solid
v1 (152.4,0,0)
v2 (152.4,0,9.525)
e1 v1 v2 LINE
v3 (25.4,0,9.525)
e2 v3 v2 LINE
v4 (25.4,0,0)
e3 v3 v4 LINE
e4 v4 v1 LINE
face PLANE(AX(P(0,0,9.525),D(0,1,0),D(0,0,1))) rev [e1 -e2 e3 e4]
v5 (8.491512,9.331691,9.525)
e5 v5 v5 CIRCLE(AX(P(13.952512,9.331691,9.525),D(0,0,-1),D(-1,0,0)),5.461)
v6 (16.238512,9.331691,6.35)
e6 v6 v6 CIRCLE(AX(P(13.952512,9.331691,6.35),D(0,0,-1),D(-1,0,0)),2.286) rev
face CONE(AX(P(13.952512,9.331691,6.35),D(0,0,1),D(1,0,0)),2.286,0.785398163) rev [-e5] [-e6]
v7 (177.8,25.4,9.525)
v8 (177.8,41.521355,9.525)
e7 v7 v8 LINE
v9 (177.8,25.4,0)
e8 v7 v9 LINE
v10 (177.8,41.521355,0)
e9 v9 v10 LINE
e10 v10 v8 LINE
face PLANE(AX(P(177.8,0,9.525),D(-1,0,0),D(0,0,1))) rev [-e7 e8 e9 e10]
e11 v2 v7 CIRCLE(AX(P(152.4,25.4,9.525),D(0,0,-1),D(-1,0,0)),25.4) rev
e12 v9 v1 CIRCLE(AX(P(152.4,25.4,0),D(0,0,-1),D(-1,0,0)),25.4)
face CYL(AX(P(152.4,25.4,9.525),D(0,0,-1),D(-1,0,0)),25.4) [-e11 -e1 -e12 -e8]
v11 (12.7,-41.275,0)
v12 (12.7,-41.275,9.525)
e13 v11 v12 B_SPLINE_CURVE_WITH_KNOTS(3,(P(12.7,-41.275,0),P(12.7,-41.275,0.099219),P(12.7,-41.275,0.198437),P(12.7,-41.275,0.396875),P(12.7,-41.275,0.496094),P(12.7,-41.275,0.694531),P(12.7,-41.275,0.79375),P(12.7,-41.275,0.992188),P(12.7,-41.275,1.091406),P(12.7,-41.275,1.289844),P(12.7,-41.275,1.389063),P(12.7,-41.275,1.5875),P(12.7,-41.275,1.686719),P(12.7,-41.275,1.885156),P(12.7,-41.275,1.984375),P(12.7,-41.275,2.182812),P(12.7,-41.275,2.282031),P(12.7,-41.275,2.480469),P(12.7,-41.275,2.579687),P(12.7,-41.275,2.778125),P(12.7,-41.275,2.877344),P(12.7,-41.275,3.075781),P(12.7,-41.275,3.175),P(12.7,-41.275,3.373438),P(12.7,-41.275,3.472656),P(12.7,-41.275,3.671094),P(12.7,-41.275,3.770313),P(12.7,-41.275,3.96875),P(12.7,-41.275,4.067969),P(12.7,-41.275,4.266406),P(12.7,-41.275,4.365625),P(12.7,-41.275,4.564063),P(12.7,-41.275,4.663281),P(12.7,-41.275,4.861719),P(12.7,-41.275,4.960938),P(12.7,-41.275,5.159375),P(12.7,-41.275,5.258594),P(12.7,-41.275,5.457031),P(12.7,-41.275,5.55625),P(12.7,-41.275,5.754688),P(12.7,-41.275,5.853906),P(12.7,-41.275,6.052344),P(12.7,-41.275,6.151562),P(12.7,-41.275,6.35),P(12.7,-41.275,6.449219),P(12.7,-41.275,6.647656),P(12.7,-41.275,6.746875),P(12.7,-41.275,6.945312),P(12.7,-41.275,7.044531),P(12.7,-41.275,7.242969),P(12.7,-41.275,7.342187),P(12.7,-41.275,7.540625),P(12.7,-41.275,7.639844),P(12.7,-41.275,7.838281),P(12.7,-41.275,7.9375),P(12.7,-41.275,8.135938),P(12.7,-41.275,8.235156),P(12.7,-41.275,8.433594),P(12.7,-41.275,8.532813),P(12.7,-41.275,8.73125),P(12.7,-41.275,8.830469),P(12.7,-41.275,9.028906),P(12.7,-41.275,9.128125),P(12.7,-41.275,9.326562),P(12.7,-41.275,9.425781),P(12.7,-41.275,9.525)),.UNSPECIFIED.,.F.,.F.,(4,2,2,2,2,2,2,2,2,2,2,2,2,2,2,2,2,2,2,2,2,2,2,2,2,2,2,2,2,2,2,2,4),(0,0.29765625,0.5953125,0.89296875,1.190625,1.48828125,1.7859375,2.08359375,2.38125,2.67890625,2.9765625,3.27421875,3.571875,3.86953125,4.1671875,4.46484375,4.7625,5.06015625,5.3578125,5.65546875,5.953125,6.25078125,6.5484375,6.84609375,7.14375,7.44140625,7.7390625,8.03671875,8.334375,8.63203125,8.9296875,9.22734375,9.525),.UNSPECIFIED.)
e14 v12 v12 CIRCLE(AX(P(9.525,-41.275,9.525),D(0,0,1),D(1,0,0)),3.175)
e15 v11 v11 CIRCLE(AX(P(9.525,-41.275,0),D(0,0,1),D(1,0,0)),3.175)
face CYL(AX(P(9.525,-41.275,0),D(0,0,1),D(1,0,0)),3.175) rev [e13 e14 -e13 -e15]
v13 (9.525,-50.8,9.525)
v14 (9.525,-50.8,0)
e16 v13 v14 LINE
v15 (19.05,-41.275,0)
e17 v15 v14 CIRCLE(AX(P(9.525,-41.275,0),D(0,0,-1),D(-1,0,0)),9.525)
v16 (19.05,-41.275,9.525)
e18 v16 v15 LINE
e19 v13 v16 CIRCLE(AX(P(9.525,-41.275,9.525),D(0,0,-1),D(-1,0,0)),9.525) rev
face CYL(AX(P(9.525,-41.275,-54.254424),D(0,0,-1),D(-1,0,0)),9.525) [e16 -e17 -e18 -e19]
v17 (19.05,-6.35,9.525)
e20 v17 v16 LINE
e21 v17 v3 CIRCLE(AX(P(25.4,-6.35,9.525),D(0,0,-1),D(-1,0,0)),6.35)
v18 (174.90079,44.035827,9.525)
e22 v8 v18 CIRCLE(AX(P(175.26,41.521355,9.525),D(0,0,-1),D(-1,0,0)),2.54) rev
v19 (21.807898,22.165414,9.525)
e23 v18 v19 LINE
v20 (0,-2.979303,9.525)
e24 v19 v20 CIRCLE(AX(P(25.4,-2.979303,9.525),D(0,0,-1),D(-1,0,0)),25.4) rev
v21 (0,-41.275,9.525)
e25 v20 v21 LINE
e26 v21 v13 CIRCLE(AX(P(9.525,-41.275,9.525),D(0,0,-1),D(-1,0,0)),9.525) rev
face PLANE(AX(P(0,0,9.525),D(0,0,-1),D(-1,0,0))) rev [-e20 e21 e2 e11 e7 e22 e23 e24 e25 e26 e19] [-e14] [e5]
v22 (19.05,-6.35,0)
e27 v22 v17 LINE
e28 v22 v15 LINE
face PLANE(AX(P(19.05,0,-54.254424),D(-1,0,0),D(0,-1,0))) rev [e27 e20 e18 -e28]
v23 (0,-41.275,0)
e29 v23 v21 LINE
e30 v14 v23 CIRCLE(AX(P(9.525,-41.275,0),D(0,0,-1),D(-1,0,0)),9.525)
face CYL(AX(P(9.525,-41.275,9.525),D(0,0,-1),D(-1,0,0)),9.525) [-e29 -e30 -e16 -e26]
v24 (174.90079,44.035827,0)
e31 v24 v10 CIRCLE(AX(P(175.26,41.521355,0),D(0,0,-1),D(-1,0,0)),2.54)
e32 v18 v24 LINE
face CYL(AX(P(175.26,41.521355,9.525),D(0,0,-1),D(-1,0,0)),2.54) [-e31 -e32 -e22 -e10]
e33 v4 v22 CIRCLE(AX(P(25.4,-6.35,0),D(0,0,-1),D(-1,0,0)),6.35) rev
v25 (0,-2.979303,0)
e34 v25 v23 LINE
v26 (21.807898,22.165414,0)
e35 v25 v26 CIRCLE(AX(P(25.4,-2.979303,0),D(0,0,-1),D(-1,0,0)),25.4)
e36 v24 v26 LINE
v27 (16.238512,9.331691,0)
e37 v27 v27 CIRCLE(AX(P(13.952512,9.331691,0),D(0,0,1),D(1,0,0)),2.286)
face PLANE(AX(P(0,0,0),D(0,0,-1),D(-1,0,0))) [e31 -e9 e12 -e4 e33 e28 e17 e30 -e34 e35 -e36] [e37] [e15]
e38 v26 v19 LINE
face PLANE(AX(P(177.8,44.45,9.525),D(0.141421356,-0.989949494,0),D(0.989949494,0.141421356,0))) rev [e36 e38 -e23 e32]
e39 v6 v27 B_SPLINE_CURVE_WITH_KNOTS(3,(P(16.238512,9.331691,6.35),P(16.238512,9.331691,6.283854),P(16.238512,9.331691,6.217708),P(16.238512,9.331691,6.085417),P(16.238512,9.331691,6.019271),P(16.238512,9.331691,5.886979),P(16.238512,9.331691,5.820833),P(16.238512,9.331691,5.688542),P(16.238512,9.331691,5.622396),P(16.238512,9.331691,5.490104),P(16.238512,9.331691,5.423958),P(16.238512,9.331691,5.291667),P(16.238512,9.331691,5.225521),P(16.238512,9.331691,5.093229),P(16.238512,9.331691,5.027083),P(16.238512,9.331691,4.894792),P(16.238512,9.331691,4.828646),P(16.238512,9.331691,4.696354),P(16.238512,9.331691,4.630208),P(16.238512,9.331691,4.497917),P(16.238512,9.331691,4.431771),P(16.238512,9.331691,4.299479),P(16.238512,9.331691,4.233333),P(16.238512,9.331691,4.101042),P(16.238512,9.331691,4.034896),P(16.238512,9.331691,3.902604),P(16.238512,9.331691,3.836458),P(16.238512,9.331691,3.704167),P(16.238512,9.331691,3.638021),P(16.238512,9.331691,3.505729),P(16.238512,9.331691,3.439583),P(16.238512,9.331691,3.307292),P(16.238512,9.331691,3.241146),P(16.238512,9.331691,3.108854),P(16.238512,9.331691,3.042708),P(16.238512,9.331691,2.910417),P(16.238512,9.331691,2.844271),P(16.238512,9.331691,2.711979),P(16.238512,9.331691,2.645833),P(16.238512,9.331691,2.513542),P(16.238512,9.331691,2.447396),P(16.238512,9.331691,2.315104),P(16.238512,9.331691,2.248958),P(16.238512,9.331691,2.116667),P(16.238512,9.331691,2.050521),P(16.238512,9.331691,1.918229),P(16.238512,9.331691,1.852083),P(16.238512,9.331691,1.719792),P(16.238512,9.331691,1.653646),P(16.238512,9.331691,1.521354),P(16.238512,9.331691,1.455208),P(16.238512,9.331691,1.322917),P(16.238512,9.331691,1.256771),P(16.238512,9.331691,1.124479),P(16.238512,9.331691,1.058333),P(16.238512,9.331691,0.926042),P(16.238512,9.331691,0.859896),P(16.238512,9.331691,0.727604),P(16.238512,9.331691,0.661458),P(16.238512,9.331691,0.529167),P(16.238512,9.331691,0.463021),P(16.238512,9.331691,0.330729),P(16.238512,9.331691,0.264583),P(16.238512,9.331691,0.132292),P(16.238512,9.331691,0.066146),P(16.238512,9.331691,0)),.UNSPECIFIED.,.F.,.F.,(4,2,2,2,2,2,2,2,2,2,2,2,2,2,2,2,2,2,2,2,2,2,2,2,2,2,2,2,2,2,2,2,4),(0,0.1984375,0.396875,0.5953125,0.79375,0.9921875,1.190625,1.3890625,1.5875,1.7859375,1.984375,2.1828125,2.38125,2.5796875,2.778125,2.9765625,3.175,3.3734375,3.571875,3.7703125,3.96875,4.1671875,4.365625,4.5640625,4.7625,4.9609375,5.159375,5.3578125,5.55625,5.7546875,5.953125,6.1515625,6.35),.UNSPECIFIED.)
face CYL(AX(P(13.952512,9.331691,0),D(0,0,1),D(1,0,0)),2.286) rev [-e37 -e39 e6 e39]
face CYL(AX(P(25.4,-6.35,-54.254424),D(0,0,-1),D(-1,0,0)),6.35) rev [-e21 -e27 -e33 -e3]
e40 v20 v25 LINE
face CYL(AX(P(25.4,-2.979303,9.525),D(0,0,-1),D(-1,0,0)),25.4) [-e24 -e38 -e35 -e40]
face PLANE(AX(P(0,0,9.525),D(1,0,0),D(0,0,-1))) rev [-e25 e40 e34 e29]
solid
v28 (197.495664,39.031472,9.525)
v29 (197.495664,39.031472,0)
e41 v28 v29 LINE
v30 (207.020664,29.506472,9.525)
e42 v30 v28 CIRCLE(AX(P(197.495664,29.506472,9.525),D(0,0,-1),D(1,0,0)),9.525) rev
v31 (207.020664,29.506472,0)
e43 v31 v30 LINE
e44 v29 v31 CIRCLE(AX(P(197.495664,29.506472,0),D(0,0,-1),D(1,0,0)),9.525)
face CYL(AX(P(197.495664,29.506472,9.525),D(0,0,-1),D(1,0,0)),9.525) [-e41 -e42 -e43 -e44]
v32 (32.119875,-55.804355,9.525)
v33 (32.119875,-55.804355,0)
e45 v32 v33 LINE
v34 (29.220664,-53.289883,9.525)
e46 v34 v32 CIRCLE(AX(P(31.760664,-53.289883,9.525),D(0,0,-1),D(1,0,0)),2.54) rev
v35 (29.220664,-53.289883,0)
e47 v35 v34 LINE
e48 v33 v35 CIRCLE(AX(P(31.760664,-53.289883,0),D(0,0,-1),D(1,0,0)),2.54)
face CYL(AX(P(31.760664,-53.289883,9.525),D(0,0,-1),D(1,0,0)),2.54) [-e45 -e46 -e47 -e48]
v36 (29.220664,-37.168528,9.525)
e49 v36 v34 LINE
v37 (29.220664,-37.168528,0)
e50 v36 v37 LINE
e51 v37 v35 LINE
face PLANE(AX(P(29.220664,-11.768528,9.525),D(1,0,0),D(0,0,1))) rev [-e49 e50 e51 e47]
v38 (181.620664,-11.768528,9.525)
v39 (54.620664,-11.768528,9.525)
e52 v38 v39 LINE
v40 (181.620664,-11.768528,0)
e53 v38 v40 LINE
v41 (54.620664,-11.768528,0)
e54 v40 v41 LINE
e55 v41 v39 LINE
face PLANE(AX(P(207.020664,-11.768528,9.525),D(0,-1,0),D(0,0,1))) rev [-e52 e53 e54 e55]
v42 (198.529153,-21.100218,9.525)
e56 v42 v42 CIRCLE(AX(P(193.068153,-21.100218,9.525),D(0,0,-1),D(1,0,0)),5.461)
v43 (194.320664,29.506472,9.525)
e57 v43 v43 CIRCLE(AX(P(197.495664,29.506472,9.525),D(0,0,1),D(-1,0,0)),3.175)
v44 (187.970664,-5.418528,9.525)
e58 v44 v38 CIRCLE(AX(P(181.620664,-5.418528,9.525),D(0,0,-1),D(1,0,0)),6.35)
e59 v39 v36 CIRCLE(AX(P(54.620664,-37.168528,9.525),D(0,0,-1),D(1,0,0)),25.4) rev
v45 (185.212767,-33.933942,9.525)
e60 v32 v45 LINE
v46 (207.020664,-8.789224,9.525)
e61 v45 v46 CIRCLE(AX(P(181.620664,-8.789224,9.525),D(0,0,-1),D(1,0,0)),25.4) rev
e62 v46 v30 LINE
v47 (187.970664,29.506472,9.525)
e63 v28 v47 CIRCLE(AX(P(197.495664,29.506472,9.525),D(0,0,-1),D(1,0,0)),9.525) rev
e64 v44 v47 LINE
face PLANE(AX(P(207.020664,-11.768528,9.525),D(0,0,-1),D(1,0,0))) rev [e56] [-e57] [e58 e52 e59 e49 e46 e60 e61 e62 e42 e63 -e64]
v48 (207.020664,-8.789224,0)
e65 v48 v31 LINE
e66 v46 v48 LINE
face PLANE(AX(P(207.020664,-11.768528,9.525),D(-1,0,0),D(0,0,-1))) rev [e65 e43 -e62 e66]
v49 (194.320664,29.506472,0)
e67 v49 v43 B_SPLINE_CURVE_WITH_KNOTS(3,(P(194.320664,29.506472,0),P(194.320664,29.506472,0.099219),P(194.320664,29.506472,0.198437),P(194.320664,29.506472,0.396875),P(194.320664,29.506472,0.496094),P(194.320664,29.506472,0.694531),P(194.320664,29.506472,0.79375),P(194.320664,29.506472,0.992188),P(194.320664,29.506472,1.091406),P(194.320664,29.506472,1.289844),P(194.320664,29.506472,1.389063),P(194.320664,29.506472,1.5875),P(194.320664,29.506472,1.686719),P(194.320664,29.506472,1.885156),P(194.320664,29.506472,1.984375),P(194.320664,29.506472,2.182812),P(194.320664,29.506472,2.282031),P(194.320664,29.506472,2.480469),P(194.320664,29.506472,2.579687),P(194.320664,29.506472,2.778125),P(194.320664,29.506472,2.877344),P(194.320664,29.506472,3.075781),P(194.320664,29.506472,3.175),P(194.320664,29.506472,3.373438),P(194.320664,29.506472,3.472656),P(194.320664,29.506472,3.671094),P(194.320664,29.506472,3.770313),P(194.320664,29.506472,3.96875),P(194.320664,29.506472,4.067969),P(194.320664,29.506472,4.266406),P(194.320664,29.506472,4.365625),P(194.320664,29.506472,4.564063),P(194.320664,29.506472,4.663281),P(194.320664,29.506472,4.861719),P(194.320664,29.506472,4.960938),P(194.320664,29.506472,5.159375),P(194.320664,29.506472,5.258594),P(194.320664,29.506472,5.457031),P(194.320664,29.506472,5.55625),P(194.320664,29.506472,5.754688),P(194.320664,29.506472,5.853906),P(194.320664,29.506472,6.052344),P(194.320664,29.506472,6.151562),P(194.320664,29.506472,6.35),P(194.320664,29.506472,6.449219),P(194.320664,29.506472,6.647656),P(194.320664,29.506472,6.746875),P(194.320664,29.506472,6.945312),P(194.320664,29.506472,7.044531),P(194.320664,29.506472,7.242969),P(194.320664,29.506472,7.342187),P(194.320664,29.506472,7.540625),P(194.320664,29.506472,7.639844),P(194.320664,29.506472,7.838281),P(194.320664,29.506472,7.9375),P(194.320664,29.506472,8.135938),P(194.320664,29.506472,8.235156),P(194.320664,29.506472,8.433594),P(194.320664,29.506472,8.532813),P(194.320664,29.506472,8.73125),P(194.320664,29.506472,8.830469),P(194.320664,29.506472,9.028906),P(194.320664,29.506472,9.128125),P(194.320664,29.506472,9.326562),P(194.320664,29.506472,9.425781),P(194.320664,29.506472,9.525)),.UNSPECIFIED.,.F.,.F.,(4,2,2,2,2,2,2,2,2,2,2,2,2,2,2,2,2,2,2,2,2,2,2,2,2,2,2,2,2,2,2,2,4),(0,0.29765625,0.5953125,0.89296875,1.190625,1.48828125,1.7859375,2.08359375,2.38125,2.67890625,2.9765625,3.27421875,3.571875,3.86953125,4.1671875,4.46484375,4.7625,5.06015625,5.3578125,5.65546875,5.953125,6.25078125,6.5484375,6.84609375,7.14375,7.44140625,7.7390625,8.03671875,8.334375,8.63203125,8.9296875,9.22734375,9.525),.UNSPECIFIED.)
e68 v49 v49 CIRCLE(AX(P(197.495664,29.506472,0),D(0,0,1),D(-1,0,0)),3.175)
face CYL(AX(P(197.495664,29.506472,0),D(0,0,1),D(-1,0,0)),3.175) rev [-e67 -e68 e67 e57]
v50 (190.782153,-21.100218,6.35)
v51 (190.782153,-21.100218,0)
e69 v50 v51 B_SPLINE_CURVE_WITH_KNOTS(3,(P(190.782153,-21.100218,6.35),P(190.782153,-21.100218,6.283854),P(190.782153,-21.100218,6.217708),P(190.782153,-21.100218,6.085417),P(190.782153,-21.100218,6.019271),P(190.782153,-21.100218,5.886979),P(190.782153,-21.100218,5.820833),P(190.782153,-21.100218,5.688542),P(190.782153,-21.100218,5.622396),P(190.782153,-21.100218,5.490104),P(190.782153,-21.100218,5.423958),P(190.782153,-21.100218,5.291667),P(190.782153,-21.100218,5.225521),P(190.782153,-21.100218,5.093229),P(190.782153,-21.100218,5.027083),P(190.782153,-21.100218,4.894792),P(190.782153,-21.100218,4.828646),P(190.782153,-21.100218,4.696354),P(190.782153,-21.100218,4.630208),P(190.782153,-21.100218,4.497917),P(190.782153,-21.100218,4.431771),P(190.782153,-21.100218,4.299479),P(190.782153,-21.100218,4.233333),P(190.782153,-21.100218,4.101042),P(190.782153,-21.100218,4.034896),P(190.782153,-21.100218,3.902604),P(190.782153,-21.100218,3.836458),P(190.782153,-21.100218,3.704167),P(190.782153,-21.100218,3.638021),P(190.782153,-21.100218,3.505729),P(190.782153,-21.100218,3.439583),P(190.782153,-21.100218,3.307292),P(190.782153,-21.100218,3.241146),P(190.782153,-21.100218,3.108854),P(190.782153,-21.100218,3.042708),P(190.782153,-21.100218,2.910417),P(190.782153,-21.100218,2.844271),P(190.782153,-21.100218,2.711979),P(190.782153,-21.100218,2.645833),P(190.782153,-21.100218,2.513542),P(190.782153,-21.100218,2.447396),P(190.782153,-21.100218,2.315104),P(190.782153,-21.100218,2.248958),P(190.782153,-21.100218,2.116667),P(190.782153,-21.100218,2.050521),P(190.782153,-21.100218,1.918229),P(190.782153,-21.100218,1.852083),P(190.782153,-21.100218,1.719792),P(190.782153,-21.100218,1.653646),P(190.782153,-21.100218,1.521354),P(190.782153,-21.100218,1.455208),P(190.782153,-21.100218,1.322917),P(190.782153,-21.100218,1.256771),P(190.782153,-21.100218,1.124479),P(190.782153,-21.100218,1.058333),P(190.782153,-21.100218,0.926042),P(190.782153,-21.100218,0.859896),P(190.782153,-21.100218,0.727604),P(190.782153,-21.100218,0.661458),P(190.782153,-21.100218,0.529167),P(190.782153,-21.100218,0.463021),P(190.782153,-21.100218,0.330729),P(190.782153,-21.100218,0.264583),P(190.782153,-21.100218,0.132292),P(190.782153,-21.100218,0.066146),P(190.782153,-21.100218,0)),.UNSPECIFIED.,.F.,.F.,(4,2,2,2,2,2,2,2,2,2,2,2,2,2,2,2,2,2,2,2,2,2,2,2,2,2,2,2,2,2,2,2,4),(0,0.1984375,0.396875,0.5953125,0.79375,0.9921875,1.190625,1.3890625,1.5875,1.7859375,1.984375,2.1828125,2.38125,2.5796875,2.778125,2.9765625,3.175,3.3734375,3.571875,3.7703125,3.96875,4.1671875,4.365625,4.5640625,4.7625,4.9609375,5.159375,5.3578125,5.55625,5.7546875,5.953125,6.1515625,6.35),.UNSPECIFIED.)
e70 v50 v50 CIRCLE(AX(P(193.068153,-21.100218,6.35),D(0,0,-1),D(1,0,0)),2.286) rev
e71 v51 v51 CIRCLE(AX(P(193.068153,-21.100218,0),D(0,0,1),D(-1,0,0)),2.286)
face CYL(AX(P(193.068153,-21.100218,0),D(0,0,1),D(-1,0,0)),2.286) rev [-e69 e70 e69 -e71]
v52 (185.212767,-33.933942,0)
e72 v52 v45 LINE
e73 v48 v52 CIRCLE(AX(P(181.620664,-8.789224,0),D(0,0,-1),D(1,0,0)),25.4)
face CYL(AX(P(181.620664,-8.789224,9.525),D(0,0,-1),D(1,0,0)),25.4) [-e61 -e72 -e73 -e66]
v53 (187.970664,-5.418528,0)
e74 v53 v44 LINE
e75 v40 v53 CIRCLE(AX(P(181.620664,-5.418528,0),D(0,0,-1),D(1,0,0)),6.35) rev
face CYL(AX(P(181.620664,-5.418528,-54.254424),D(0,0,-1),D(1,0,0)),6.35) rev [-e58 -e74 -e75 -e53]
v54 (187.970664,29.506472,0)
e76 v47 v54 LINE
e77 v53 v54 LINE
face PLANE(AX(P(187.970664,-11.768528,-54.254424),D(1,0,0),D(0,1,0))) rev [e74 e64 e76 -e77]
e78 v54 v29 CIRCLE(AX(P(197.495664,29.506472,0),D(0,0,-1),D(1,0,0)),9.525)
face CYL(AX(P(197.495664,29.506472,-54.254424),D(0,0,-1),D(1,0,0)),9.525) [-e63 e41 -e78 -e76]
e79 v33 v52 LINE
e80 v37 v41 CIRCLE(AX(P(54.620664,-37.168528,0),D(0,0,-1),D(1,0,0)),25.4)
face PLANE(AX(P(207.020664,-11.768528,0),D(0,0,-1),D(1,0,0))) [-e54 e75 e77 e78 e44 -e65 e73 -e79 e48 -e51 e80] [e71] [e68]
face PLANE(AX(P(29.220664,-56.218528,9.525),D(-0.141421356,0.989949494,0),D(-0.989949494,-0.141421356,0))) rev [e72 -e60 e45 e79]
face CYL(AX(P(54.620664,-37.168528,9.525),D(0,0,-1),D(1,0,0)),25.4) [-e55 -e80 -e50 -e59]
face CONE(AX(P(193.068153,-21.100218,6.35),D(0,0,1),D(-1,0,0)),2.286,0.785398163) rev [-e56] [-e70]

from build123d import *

# Parameters (mm, degrees)
BOSS_EXTRUDE1_DEPTH = 9.525
SKETCH4_W           = 19.05
SKETCH4_H           = 50.8
BOSS_EXTRUDE2_DEPTH = 9.525
FILLET1_R           = 2.54
SKETCH2_R           = 3.175
CUT_EXTRUDE1_DEPTH  = 186.15994606
FILLET2_R           = 25.4
FILLET3_R           = 25.4
FILLET4_R           = 6.35
FILLET5_R           = 9.525
SKETCH6_R           = 2.286
CUT_EXTRUDE3_DEPTH  = 186.15994606
CHAMFER1_SIZE       = 3.175
CIRPATTERN1_COUNT   = 2


with BuildPart() as part:
    # Sketch1 → Boss-Extrude1 (new body)
    with BuildSketch(Plane.XY):
        Polygon((0, 0), (177.8, 0), (177.8, 44.45), (0, 19.05), align=None)
    extrude(amount=BOSS_EXTRUDE1_DEPTH)

    # Sketch4 → Boss-Extrude2 (add)
    with BuildSketch(Plane.XY.offset(9.525)):
        with Locations((9.525, -25.4)):
            Rectangle(SKETCH4_W, SKETCH4_H)
    extrude(amount=-BOSS_EXTRUDE2_DEPTH)

    # Fillet1
    fillet1_edges = [part.edges().sort_by_distance(p)[0] for p in [
        (177.8, 44.45, 4.7625),
    ]]
    fillet(fillet1_edges, radius=FILLET1_R)

    # Sketch2 → Cut-Extrude1 (cut, through all)
    with BuildSketch(Plane.XY.offset(9.525)):
        with Locations((9.525, -41.275)):
            Circle(SKETCH2_R)
    extrude(amount=-CUT_EXTRUDE1_DEPTH, mode=Mode.SUBTRACT)

    # Fillet2
    fillet2_edges = [part.edges().sort_by_distance(p)[0] for p in [
        (177.8, 0, 4.7625),
    ]]
    fillet(fillet2_edges, radius=FILLET2_R)

    # Fillet3
    fillet3_edges = [part.edges().sort_by_distance(p)[0] for p in [
        (0, 19.05, 4.7625),
    ]]
    fillet(fillet3_edges, radius=FILLET3_R)

    # Fillet4
    fillet4_edges = [part.edges().sort_by_distance(p)[0] for p in [
        (19.05, 0, 4.7625),
    ]]
    fillet(fillet4_edges, radius=FILLET4_R)

    # Fillet5
    fillet5_edges = [part.edges().sort_by_distance(p)[0] for p in [
        (19.05, -50.8, 4.7625),
        (0, -50.8, 4.7625),
    ]]
    fillet(fillet5_edges, radius=FILLET5_R - 0.0001)  # a hair under: the kernel refuses the full size

    # Sketch6 → Cut-Extrude3 (cut, through all)
    with BuildSketch(Plane.XY.offset(9.525)):
        with Locations((13.952511732, 9.331690663)):
            Circle(SKETCH6_R)
    extrude(amount=-CUT_EXTRUDE3_DEPTH, mode=Mode.SUBTRACT)

    # Chamfer1
    chamfer1_edges = [part.edges().sort_by_distance(p)[0] for p in [
        (11.666511732, 9.331690663, 9.525),
    ]]
    chamfer(chamfer1_edges, length=CHAMFER1_SIZE)


with BuildPart() as cirpattern1_1:
    # CirPattern1: pattern copy
    add(part.part.rotate(Axis((103.510332135, -5.88426384, 0), (0, 0, 1)), 1 * 360 / CIRPATTERN1_COUNT))


solid = Compound([part.part, cirpattern1_1.part])
